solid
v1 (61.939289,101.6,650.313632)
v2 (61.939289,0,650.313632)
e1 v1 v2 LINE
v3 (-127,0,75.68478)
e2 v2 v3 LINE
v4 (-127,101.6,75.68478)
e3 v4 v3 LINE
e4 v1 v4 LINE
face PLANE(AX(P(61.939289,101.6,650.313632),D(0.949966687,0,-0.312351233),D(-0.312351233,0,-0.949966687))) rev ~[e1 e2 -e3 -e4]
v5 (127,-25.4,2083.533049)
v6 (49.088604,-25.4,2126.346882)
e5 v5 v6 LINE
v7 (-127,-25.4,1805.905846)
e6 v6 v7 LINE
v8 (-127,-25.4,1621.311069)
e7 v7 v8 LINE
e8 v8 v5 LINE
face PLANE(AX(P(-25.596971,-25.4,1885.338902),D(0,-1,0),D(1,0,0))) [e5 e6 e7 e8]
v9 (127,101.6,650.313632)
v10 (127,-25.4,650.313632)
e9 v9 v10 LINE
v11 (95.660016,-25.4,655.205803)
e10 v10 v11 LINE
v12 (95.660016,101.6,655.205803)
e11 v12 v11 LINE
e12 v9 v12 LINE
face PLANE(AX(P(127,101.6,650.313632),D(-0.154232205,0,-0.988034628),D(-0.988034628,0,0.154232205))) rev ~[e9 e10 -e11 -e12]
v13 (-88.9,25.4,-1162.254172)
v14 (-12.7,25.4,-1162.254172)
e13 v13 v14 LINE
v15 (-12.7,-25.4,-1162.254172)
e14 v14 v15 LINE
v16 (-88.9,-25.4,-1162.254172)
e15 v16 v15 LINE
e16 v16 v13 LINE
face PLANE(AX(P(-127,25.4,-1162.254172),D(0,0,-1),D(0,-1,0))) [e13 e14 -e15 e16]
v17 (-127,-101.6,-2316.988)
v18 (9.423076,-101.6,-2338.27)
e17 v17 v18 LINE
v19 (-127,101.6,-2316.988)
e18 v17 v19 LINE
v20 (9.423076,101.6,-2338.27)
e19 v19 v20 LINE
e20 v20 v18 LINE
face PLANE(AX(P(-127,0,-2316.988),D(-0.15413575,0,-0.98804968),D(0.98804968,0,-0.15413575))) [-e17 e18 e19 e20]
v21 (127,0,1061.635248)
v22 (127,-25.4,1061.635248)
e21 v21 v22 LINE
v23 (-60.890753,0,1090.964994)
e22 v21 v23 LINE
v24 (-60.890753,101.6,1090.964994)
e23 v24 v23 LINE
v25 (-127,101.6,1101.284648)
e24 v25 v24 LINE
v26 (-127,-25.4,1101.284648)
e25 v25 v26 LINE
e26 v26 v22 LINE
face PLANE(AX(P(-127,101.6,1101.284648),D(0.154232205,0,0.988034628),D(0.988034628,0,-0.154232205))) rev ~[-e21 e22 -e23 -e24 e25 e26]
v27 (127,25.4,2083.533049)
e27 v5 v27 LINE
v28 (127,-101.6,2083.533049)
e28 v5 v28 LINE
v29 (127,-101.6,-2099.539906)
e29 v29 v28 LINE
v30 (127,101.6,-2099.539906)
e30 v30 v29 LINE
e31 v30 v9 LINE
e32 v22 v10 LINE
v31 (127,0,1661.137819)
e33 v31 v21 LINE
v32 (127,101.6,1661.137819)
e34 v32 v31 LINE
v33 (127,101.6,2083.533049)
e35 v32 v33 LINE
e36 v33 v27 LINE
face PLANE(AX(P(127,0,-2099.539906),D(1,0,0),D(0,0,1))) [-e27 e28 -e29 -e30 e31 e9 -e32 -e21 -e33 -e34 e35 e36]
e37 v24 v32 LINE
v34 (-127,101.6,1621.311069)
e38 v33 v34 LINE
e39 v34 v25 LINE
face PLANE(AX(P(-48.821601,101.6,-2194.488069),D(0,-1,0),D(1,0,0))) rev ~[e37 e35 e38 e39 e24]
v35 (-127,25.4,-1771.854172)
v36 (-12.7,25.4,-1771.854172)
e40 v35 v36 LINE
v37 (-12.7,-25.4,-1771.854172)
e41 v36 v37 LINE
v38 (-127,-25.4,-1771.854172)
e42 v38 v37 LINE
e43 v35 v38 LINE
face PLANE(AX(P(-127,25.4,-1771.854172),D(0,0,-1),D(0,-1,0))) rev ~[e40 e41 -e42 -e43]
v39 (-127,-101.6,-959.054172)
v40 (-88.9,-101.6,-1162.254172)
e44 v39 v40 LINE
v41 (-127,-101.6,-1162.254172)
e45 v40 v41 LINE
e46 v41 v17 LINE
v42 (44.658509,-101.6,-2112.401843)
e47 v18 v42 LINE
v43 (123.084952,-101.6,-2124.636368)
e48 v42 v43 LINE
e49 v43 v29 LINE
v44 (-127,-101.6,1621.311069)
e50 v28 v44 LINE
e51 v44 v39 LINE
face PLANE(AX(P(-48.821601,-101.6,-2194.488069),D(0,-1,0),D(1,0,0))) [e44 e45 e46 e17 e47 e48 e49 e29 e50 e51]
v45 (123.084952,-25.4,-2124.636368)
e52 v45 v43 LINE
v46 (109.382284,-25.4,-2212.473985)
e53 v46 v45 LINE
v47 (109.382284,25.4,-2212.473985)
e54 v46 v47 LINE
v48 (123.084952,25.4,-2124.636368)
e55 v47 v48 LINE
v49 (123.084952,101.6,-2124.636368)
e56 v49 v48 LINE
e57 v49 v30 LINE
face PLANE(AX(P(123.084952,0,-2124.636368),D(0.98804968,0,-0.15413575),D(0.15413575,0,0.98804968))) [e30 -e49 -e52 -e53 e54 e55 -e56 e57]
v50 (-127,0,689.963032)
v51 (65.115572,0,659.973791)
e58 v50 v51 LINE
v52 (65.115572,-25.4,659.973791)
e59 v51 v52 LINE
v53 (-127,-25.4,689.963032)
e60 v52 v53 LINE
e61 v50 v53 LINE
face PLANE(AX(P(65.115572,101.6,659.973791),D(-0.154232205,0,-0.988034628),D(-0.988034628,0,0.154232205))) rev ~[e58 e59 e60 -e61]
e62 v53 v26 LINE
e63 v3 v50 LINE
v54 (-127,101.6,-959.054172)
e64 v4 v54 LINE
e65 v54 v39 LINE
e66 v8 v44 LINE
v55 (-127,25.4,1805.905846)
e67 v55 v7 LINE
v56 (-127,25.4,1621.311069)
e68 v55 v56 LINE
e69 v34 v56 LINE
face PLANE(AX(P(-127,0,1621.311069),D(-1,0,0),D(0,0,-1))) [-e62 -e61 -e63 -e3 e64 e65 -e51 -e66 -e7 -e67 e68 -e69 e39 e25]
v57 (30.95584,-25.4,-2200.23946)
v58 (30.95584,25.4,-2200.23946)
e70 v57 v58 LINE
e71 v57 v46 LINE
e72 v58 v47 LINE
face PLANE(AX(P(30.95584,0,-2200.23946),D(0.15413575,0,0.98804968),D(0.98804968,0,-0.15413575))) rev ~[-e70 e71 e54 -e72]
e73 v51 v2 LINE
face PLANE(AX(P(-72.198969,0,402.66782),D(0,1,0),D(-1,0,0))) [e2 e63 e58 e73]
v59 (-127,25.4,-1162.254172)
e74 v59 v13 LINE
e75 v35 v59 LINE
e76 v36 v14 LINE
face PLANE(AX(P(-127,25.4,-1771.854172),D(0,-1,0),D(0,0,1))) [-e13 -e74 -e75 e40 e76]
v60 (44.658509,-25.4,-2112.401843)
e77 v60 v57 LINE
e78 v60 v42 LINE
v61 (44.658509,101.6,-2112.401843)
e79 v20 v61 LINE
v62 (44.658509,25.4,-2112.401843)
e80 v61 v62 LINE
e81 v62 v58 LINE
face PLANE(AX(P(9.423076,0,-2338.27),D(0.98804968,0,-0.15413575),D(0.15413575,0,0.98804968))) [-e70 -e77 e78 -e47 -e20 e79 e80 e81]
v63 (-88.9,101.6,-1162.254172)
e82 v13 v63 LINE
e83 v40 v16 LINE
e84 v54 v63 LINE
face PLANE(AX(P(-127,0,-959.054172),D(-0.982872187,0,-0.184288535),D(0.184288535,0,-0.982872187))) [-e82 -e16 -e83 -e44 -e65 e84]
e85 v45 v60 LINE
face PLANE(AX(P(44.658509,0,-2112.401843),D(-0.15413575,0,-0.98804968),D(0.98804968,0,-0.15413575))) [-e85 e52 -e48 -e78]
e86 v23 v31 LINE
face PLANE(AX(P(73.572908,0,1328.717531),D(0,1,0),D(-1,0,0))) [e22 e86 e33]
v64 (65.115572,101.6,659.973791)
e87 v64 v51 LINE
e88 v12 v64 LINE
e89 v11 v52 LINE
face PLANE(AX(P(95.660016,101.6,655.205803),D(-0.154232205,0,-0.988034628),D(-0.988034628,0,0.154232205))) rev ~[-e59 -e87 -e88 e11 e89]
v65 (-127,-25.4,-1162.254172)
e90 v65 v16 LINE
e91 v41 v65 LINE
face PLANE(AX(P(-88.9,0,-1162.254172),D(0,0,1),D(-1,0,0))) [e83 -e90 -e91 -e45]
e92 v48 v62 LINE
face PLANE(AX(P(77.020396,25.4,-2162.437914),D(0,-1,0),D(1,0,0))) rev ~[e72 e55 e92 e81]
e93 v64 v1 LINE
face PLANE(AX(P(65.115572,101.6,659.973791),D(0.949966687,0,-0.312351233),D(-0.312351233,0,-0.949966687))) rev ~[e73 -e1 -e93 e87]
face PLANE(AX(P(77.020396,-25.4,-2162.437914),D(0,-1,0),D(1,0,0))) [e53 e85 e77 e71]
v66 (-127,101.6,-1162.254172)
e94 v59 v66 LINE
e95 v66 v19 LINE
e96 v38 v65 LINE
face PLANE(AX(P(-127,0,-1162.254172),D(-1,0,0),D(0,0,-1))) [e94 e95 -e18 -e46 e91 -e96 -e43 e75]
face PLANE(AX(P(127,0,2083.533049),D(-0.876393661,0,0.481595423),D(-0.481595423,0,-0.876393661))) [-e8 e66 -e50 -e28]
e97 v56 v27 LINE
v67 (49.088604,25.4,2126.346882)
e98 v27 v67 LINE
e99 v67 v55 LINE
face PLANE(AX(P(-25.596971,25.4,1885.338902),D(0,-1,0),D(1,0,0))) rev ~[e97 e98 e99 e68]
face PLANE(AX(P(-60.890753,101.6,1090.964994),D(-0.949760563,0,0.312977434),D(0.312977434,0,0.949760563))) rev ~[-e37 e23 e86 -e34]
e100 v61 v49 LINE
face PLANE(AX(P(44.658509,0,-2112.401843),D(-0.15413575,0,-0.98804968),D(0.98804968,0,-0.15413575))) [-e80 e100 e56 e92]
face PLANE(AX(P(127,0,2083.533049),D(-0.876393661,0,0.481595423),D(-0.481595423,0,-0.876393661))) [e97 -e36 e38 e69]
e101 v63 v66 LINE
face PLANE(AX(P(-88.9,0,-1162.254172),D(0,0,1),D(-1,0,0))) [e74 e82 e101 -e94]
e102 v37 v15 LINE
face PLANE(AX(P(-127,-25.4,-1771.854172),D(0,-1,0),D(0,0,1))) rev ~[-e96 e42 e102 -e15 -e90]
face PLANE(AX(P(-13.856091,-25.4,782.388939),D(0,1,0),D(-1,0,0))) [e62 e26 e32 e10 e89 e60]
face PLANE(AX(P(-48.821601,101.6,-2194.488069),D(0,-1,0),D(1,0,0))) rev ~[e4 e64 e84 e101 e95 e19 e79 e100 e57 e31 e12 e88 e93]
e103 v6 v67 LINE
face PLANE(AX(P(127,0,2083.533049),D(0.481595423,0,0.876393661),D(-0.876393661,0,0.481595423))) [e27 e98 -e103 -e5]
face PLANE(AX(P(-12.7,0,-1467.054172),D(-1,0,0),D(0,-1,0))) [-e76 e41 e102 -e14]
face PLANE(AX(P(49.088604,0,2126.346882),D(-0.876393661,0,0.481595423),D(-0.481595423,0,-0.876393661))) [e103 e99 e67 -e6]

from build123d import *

# Parameters (mm, degrees)
F1_DEPTH = 101.6
F2_DEPTH = 25.4
F4_DEPTH = 127
F5_DEPTH = 101.6
F6_W     = 50.8
F6_H     = 609.6
F7_DEPTH = 114.3


# Not quite as in the source:
# - a feature names something its author has since deleted; it is built from what else it names


with BuildPart() as f1:
    # F0 (on Front) → F1 (new body, symmetric)
    with BuildSketch(Plane.XZ):
        Polygon((48.5735566343, -2087.3053811025), (-127, -2059.9159062675), (-127, -2316.988), (9.4230761062, -2338.2699998726), (30.9558403967, -2200.239459549), (44.6585085815, -2112.4018429795), align=None)
        Polygon((123.0849519472, -2124.6363681445), (127, -2099.5399062675), (48.5735566343, -2087.3053811025), (44.6585085815, -2112.4018429795), align=None)
        Polygon((127, -2099.5399062675), (127, -1584.5717697842), (48.5735566343, -2087.3053811025), align=None)
        Polygon((127, 2083.5330486298), (-127, 1621.3110685349), (-127, -959.054172039), (-88.9, -1162.254172039), (-127, -1162.254172039), (-127, -2059.9159062675), (48.5735566343, -2087.3053811025), (127, -1584.5717697842), (127, 1383.5908232688), align=None)
    extrude(amount=F1_DEPTH, both=True)

    # F0 (on Front) → F2 (join, symmetric)
    with BuildSketch(Plane.XZ):
        Polygon((109.3822837623, -2212.4739847141), (123.0849519472, -2124.6363681445), (44.6585085815, -2112.4018429795), (30.9558403967, -2200.239459549), align=None)
        Polygon((49.0886035459, 2126.3468817047), (-127, 1805.9058462593), (-127, 1621.3110685349), (127, 2083.5330486298), align=None)
    extrude(amount=F2_DEPTH, both=True)

    # F3 (on face) → F4 (cut)
    with BuildSketch(Plane(origin=(0, 101.6, 0), x_dir=(-1, 0, 0), z_dir=(0, 1, 0))):
        Polygon((-124.6851625392, 841.1452440828), (-65.1155717719, 659.9737911019), (127, 689.9630318555), (127, 890.3500338664), (125.3471307259, 895.3658269662), (-127, 855.9744398599), align=None)
        Polygon((127, 895.6238398599), (125.3471307259, 895.3658269662), (127, 890.3500338664), align=None)
        Polygon((-127, 1061.6352478643), (-127, 855.9744398599), (125.3471307259, 895.3658269662), (60.8907531403, 1090.9649944295), align=None)
        Polygon((60.8907531403, 1090.9649944295), (125.3471307259, 895.3658269662), (127, 895.6238398599), (127, 1101.2846478643), align=None)
        Polygon((-124.6851625392, 841.1452440828), (-95.6600158458, 655.2058033819), (-65.1155717719, 659.9737911019), align=None)
        Polygon((-127, 848.1854547136), (-127, 650.3136318555), (-95.6600158458, 655.2058033819), (-124.6851625392, 841.1452440828), align=None)
        Polygon((-127, 855.9744398599), (-127, 848.1854547136), (-124.6851625392, 841.1452440828), align=None)
    extrude(amount=-F4_DEPTH, mode=Mode.SUBTRACT)

    # F3 (on face) → F5 (cut)
    with BuildSketch(Plane(origin=(0, 101.6, 0), x_dir=(-1, 0, 0), z_dir=(0, 1, 0))):
        Polygon((127, 650.3136318555), (-61.9392891755, 650.3136318555), (127, 75.6847800506), align=None)
        Polygon((-65.1155717719, 659.9737911019), (-61.9392891755, 650.3136318555), (127, 650.3136318555), (127, 689.9630318555), align=None)
        Polygon((-127, 1661.1378192902), (-127, 1061.6352478643), (60.8907531403, 1090.9649944295), align=None)
    extrude(amount=-F5_DEPTH, mode=Mode.SUBTRACT)

    # F6 (on face) → F7 (cut)
    with BuildSketch(Plane(origin=(-127, 0, 0), x_dir=(0, -1, 0), z_dir=(-1, 0, 0))):
        with Locations((0, -1467.054172039)):
            Rectangle(F6_W, F6_H)
    extrude(amount=-F7_DEPTH, mode=Mode.SUBTRACT)


solid = f1.part
